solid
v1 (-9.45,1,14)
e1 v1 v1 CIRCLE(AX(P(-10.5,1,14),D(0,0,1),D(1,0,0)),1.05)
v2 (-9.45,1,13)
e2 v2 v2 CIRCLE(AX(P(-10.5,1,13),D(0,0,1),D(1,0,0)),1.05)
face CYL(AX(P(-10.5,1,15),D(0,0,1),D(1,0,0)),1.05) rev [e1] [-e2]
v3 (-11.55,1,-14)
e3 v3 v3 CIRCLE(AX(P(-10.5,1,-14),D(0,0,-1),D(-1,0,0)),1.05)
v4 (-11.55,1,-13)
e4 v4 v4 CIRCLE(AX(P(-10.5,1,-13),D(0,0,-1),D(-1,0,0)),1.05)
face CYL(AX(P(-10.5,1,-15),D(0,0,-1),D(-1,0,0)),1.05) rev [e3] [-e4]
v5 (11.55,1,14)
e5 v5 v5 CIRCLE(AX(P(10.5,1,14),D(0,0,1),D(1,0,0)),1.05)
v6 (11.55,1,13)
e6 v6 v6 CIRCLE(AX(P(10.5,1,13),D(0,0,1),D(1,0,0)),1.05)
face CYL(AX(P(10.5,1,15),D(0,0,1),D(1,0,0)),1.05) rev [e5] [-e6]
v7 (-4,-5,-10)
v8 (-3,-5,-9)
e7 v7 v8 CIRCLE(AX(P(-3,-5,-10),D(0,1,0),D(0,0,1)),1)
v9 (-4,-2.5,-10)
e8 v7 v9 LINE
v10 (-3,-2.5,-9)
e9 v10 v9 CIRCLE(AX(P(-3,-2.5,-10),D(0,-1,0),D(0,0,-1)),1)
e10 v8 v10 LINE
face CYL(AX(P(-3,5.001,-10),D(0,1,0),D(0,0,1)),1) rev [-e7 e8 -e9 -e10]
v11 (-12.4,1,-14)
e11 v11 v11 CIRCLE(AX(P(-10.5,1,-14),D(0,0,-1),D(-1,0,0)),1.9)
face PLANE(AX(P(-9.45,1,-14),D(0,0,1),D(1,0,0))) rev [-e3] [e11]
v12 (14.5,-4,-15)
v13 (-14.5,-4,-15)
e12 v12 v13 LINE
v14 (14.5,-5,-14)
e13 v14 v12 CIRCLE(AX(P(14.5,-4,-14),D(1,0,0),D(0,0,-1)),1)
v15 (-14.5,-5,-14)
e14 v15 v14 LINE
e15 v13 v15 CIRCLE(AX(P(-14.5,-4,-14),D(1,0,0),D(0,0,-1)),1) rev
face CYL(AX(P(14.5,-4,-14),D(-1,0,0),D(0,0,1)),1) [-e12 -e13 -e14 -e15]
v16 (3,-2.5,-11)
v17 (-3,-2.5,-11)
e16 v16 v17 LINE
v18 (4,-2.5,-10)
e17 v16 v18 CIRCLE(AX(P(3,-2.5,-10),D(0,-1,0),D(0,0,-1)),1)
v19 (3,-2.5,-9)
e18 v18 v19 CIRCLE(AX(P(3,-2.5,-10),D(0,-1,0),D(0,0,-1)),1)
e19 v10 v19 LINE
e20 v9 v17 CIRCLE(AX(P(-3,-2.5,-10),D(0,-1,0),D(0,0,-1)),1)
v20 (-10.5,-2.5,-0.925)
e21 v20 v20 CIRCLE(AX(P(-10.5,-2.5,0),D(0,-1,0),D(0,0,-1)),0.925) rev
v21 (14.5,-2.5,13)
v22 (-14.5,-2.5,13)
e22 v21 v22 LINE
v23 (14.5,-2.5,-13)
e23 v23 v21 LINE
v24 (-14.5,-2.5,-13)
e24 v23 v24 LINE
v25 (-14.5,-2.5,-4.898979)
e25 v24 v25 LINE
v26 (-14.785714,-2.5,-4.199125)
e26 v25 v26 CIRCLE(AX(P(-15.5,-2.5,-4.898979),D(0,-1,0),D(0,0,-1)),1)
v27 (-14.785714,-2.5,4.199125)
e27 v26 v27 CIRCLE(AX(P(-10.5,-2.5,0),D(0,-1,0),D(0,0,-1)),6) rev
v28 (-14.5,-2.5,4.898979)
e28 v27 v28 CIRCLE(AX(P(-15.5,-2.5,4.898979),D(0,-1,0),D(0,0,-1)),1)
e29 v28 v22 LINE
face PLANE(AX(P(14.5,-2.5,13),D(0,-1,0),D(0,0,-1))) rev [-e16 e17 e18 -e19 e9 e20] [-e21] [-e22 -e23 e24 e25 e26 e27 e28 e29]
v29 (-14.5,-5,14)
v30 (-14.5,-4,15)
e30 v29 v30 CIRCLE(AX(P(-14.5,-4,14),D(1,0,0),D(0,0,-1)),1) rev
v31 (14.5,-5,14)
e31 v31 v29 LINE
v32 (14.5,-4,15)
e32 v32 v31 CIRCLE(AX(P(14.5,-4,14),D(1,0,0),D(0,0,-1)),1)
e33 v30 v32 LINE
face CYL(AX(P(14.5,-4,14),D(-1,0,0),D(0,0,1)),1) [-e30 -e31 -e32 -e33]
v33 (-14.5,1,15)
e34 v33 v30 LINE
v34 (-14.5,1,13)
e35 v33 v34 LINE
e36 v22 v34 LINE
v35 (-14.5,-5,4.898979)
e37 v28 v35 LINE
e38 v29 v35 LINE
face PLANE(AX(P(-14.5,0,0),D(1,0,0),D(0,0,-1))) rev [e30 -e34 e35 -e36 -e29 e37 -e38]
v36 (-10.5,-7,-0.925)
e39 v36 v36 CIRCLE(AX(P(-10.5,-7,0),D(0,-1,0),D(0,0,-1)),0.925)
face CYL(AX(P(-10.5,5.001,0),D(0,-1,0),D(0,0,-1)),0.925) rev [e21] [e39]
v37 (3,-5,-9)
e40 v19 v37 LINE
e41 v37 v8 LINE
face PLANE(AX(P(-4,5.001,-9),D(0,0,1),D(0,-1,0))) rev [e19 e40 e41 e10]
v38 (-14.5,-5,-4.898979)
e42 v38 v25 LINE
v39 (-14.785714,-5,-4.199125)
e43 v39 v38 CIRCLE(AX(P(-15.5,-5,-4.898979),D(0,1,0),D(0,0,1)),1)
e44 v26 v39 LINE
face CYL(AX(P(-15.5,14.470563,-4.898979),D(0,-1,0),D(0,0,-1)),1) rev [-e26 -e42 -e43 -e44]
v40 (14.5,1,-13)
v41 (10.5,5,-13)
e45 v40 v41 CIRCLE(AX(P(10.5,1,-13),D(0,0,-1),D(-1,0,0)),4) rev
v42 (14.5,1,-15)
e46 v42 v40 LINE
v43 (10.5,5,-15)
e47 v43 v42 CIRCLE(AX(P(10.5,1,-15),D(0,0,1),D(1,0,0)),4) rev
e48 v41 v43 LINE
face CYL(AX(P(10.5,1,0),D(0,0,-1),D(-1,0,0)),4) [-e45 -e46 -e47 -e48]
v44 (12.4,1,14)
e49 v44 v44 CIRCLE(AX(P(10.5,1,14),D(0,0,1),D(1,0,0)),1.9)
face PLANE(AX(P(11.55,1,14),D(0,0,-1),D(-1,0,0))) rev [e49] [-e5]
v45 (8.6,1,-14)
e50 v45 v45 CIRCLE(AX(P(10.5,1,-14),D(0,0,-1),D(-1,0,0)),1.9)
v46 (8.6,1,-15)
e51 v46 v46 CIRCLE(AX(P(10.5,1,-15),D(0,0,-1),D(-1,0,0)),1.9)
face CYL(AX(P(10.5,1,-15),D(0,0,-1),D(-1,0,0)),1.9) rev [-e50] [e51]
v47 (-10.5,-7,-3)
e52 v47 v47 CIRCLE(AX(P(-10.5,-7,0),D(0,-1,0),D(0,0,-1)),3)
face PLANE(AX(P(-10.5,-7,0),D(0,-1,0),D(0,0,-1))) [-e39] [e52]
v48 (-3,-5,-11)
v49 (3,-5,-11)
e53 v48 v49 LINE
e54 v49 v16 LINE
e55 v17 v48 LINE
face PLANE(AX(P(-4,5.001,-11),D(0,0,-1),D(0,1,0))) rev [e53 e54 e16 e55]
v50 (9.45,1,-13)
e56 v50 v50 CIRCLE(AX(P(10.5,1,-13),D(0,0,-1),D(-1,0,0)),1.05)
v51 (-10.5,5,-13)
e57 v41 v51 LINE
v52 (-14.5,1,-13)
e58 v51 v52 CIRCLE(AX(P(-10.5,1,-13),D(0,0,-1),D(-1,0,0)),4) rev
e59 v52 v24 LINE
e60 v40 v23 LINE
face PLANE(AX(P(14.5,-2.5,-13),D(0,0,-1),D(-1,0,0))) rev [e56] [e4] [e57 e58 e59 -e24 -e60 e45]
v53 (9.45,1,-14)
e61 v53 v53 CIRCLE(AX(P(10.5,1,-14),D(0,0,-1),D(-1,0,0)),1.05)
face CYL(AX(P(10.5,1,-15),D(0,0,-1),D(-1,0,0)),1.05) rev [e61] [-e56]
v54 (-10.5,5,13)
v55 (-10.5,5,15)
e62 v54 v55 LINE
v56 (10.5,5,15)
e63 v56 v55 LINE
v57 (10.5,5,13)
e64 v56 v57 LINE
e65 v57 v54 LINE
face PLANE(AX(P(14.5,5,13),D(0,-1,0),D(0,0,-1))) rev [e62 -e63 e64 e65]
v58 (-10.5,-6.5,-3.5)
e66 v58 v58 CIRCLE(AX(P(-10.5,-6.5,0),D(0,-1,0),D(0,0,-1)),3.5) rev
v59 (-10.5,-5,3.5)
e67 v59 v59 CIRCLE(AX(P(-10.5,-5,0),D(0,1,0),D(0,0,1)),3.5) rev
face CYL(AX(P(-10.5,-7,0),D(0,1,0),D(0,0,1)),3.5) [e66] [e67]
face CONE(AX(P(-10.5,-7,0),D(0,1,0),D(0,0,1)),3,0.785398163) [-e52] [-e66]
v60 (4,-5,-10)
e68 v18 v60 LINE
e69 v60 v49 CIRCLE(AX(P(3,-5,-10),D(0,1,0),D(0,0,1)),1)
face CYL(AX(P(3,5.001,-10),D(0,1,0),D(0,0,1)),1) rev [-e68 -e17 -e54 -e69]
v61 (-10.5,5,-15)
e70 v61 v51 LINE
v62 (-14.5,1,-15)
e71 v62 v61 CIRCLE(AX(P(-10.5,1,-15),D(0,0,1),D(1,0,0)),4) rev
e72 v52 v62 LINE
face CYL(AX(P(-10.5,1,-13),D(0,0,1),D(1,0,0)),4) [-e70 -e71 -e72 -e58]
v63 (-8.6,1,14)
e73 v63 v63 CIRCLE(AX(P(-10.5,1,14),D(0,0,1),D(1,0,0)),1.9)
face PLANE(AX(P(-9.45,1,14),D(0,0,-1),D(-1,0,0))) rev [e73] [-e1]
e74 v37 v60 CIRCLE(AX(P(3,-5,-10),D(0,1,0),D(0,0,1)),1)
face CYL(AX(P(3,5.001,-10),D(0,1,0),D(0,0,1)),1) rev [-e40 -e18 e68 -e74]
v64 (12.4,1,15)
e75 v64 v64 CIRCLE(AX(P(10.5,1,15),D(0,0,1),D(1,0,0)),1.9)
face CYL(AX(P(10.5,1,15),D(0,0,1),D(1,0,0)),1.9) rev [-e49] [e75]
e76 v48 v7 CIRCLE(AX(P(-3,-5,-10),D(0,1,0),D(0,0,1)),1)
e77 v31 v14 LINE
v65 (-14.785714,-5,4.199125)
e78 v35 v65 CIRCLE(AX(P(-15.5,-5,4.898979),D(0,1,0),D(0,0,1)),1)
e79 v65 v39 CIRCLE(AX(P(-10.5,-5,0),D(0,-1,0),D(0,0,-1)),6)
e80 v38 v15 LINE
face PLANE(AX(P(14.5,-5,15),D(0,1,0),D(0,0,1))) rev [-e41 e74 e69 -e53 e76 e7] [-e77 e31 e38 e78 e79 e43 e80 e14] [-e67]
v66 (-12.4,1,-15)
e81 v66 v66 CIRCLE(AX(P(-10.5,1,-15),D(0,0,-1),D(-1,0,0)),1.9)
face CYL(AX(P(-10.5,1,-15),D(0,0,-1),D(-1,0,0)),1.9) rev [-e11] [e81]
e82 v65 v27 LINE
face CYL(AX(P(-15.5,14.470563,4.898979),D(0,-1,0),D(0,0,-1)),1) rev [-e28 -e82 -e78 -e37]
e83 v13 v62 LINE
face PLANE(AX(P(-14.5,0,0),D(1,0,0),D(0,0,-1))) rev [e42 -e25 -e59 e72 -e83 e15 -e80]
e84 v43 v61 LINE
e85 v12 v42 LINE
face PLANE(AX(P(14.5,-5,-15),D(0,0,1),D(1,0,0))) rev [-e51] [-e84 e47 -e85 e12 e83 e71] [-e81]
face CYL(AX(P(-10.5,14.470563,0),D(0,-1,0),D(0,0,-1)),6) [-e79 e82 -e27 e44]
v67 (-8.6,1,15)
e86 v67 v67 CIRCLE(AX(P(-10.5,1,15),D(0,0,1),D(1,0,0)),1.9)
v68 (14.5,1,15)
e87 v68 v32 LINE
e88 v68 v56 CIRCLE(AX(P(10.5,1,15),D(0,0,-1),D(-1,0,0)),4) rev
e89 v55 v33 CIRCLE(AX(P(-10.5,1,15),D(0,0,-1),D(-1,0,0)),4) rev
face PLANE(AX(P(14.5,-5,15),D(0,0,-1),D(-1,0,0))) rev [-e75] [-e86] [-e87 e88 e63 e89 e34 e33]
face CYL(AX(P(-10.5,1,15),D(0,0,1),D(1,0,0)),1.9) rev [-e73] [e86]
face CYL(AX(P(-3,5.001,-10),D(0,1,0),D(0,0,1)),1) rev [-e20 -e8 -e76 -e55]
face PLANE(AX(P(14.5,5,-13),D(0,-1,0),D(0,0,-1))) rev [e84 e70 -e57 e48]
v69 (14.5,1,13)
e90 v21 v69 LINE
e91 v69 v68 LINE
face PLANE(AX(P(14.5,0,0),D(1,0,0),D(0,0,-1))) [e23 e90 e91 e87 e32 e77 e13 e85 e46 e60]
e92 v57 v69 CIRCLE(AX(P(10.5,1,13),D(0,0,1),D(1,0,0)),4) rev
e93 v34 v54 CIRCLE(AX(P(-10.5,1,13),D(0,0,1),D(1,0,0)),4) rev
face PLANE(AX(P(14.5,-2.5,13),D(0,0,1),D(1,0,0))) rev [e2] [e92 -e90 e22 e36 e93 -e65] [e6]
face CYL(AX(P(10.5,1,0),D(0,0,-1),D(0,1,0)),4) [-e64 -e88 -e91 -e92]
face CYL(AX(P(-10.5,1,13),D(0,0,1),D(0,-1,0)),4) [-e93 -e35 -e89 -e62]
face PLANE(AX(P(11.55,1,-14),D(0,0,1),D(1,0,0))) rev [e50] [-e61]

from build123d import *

# Parameters (mm, degrees)
EXTRUDE_1_DEPTH              = 14.5
HOLE_START                   = -15
HOLE_WIZARD_M2_1_OUTLINE_R   = 1.9
HOLE_WIZARD_M2_1_DEPTH       = 1
HOLE_START_2                 = -14
HOLE_WIZARD_M2_1_2_OUTLINE_R = 1.05
HOLE_WIZARD_M2_1_2_DEPTH     = 1
SKETCH_5_R                   = 6
EXTRUDE_2_DEPTH              = 2.5
SKETCH_6_R                   = 3.5
EXTRUDE_3_DEPTH              = 2
CHAMFER_1_SIZE               = 0.5
CUT_EXTRUDE_1_REACH          = 27.323
SKETCH_7_R                   = 0.925
FILLET_1_R                   = 4
FILLET_2_R                   = 1
CUT_EXTRUDE_2_REACH          = 26.439
SKETCH_8_W                   = 8
SKETCH_8_H                   = 2
FILLET_3_R                   = 1


# Read off the part's stored shape, not the designer's step: M2 丸平ねじ用座ぐり穴1
with BuildPart() as part:
    # ｽｹｯﾁ1 → ﾎﾞｽ - 押し出し1 (new, symmetric)
    with BuildSketch(Plane(origin=(0, 0, 0), x_dir=(0, 0, -1), z_dir=(1, 0, 0))):
        Polygon((-15, -5), (15, -5), (15, 5), (13, 5), (13, -2.5), (-13, -2.5), (-13, 5), (-15, 5), align=None)
    extrude(amount=EXTRUDE_1_DEPTH, both=True)

    # M2 丸平ねじ用座ぐり穴1 outline → M2 丸平ねじ用座ぐり穴1 (cut)
    with BuildSketch(Plane.XY.offset(HOLE_START)):
        with Locations((-10.5, 1)):
            Circle(HOLE_WIZARD_M2_1_OUTLINE_R)
        with Locations((10.5, 1)):
            Circle(HOLE_WIZARD_M2_1_OUTLINE_R)
    hole_wizard_m2_1 = extrude(amount=HOLE_WIZARD_M2_1_DEPTH, mode=Mode.SUBTRACT)

    # Hole Wizard M2 _1 2 outline → Hole Wizard M2 _1 2 (cut)
    with BuildSketch(Plane.XY.offset(HOLE_START_2)):
        with Locations((-10.5, 1)):
            Circle(HOLE_WIZARD_M2_1_2_OUTLINE_R)
        with Locations((10.5, 1)):
            Circle(HOLE_WIZARD_M2_1_2_OUTLINE_R)
    hole_wizard_m2_1_2 = extrude(amount=HOLE_WIZARD_M2_1_2_DEPTH, mode=Mode.SUBTRACT)

    # ｽｹｯﾁ5 → ﾎﾞｽ - 押し出し2 (add)
    with BuildSketch(Plane.XZ.offset(5)):
        with Locations((-10.5, 0)):
            Circle(SKETCH_5_R)
    extrude(amount=-EXTRUDE_2_DEPTH)

    # ｽｹｯﾁ6 → ﾎﾞｽ - 押し出し3 (add)
    with BuildSketch(Plane.XZ.offset(5)):
        with Locations(Location((-10.5, 0, 0), (0, 0, 90))):
            Circle(SKETCH_6_R)
    extrude(amount=EXTRUDE_3_DEPTH)

    # 面取り1
    chamfer_1_edges = [part.edges().sort_by_distance(p)[0] for p in [
        (-10.5, -7, -3.5),
    ]]
    chamfer(chamfer_1_edges, length=CHAMFER_1_SIZE)

    # ｽｹｯﾁ7 → ｶｯﾄ - 押し出し1 (cut, up to next)
    with BuildSketch(Plane.XZ.offset(7), mode=Mode.PRIVATE) as cut_extrude_1_sk1:
        with Locations(Location((-10.5, 0, 0), (0, 0, 270))):
            Circle(SKETCH_7_R)
    cut_extrude_1_tool1 = extrude(cut_extrude_1_sk1.sketch, amount=-CUT_EXTRUDE_1_REACH, mode=Mode.PRIVATE) & part.part
    add(cut_extrude_1_tool1.solids().sort_by_distance((-10.5, -7, 0))[0], mode=Mode.SUBTRACT)

    # ﾌｨﾚｯﾄ1
    fillet_1_edges = [part.edges().sort_by_distance(p)[0] for p in [
        (-14.5, 5, 14),
        (14.5, 5, -14),
        (14.5, 5, 14),
        (-14.5, 5, -14),
    ]]
    fillet(fillet_1_edges, radius=FILLET_1_R)

    # ﾌｨﾚｯﾄ2
    fillet_2_edges = [part.edges().sort_by_distance(p)[0] for p in [
        (0, -5, -15),
        (0, -5, 15),
        (-14.5, -3.75, -4.472135955),
        (-14.5, -3.75, 4.472135955),
    ]]
    fillet(fillet_2_edges, radius=FILLET_2_R)

    # ｽｹｯﾁ8 → ｶｯﾄ - 押し出し2 (cut, up to next)
    with BuildSketch(Plane.XZ.offset(5), mode=Mode.PRIVATE) as cut_extrude_2_sk1:
        with Locations((0, -10)):
            Rectangle(SKETCH_8_W, SKETCH_8_H)
    cut_extrude_2_tool1 = extrude(cut_extrude_2_sk1.sketch, amount=-CUT_EXTRUDE_2_REACH, mode=Mode.PRIVATE) & part.part
    add(cut_extrude_2_tool1.solids().sort_by_distance((0, -5, -10))[0], mode=Mode.SUBTRACT)

    # ﾌｨﾚｯﾄ3
    fillet_3_edges = [part.edges().sort_by_distance(p)[0] for p in [
        (4, -3.75, -9),
        (-4, -3.75, -9),
        (-4, -3.75, -11),
        (4, -3.75, -11),
    ]]
    fillet(fillet_3_edges, radius=FILLET_3_R - 0.0001)  # a hair under: the kernel refuses the full size

    # ﾐﾗｰ1: M2 丸平ねじ用座ぐり穴1, Hole Wizard M2 _1 2 across plane
    add(hole_wizard_m2_1.mirror(Plane.XY), mode=Mode.SUBTRACT)
    add(hole_wizard_m2_1_2.mirror(Plane.XY), mode=Mode.SUBTRACT)


solid = part.part
